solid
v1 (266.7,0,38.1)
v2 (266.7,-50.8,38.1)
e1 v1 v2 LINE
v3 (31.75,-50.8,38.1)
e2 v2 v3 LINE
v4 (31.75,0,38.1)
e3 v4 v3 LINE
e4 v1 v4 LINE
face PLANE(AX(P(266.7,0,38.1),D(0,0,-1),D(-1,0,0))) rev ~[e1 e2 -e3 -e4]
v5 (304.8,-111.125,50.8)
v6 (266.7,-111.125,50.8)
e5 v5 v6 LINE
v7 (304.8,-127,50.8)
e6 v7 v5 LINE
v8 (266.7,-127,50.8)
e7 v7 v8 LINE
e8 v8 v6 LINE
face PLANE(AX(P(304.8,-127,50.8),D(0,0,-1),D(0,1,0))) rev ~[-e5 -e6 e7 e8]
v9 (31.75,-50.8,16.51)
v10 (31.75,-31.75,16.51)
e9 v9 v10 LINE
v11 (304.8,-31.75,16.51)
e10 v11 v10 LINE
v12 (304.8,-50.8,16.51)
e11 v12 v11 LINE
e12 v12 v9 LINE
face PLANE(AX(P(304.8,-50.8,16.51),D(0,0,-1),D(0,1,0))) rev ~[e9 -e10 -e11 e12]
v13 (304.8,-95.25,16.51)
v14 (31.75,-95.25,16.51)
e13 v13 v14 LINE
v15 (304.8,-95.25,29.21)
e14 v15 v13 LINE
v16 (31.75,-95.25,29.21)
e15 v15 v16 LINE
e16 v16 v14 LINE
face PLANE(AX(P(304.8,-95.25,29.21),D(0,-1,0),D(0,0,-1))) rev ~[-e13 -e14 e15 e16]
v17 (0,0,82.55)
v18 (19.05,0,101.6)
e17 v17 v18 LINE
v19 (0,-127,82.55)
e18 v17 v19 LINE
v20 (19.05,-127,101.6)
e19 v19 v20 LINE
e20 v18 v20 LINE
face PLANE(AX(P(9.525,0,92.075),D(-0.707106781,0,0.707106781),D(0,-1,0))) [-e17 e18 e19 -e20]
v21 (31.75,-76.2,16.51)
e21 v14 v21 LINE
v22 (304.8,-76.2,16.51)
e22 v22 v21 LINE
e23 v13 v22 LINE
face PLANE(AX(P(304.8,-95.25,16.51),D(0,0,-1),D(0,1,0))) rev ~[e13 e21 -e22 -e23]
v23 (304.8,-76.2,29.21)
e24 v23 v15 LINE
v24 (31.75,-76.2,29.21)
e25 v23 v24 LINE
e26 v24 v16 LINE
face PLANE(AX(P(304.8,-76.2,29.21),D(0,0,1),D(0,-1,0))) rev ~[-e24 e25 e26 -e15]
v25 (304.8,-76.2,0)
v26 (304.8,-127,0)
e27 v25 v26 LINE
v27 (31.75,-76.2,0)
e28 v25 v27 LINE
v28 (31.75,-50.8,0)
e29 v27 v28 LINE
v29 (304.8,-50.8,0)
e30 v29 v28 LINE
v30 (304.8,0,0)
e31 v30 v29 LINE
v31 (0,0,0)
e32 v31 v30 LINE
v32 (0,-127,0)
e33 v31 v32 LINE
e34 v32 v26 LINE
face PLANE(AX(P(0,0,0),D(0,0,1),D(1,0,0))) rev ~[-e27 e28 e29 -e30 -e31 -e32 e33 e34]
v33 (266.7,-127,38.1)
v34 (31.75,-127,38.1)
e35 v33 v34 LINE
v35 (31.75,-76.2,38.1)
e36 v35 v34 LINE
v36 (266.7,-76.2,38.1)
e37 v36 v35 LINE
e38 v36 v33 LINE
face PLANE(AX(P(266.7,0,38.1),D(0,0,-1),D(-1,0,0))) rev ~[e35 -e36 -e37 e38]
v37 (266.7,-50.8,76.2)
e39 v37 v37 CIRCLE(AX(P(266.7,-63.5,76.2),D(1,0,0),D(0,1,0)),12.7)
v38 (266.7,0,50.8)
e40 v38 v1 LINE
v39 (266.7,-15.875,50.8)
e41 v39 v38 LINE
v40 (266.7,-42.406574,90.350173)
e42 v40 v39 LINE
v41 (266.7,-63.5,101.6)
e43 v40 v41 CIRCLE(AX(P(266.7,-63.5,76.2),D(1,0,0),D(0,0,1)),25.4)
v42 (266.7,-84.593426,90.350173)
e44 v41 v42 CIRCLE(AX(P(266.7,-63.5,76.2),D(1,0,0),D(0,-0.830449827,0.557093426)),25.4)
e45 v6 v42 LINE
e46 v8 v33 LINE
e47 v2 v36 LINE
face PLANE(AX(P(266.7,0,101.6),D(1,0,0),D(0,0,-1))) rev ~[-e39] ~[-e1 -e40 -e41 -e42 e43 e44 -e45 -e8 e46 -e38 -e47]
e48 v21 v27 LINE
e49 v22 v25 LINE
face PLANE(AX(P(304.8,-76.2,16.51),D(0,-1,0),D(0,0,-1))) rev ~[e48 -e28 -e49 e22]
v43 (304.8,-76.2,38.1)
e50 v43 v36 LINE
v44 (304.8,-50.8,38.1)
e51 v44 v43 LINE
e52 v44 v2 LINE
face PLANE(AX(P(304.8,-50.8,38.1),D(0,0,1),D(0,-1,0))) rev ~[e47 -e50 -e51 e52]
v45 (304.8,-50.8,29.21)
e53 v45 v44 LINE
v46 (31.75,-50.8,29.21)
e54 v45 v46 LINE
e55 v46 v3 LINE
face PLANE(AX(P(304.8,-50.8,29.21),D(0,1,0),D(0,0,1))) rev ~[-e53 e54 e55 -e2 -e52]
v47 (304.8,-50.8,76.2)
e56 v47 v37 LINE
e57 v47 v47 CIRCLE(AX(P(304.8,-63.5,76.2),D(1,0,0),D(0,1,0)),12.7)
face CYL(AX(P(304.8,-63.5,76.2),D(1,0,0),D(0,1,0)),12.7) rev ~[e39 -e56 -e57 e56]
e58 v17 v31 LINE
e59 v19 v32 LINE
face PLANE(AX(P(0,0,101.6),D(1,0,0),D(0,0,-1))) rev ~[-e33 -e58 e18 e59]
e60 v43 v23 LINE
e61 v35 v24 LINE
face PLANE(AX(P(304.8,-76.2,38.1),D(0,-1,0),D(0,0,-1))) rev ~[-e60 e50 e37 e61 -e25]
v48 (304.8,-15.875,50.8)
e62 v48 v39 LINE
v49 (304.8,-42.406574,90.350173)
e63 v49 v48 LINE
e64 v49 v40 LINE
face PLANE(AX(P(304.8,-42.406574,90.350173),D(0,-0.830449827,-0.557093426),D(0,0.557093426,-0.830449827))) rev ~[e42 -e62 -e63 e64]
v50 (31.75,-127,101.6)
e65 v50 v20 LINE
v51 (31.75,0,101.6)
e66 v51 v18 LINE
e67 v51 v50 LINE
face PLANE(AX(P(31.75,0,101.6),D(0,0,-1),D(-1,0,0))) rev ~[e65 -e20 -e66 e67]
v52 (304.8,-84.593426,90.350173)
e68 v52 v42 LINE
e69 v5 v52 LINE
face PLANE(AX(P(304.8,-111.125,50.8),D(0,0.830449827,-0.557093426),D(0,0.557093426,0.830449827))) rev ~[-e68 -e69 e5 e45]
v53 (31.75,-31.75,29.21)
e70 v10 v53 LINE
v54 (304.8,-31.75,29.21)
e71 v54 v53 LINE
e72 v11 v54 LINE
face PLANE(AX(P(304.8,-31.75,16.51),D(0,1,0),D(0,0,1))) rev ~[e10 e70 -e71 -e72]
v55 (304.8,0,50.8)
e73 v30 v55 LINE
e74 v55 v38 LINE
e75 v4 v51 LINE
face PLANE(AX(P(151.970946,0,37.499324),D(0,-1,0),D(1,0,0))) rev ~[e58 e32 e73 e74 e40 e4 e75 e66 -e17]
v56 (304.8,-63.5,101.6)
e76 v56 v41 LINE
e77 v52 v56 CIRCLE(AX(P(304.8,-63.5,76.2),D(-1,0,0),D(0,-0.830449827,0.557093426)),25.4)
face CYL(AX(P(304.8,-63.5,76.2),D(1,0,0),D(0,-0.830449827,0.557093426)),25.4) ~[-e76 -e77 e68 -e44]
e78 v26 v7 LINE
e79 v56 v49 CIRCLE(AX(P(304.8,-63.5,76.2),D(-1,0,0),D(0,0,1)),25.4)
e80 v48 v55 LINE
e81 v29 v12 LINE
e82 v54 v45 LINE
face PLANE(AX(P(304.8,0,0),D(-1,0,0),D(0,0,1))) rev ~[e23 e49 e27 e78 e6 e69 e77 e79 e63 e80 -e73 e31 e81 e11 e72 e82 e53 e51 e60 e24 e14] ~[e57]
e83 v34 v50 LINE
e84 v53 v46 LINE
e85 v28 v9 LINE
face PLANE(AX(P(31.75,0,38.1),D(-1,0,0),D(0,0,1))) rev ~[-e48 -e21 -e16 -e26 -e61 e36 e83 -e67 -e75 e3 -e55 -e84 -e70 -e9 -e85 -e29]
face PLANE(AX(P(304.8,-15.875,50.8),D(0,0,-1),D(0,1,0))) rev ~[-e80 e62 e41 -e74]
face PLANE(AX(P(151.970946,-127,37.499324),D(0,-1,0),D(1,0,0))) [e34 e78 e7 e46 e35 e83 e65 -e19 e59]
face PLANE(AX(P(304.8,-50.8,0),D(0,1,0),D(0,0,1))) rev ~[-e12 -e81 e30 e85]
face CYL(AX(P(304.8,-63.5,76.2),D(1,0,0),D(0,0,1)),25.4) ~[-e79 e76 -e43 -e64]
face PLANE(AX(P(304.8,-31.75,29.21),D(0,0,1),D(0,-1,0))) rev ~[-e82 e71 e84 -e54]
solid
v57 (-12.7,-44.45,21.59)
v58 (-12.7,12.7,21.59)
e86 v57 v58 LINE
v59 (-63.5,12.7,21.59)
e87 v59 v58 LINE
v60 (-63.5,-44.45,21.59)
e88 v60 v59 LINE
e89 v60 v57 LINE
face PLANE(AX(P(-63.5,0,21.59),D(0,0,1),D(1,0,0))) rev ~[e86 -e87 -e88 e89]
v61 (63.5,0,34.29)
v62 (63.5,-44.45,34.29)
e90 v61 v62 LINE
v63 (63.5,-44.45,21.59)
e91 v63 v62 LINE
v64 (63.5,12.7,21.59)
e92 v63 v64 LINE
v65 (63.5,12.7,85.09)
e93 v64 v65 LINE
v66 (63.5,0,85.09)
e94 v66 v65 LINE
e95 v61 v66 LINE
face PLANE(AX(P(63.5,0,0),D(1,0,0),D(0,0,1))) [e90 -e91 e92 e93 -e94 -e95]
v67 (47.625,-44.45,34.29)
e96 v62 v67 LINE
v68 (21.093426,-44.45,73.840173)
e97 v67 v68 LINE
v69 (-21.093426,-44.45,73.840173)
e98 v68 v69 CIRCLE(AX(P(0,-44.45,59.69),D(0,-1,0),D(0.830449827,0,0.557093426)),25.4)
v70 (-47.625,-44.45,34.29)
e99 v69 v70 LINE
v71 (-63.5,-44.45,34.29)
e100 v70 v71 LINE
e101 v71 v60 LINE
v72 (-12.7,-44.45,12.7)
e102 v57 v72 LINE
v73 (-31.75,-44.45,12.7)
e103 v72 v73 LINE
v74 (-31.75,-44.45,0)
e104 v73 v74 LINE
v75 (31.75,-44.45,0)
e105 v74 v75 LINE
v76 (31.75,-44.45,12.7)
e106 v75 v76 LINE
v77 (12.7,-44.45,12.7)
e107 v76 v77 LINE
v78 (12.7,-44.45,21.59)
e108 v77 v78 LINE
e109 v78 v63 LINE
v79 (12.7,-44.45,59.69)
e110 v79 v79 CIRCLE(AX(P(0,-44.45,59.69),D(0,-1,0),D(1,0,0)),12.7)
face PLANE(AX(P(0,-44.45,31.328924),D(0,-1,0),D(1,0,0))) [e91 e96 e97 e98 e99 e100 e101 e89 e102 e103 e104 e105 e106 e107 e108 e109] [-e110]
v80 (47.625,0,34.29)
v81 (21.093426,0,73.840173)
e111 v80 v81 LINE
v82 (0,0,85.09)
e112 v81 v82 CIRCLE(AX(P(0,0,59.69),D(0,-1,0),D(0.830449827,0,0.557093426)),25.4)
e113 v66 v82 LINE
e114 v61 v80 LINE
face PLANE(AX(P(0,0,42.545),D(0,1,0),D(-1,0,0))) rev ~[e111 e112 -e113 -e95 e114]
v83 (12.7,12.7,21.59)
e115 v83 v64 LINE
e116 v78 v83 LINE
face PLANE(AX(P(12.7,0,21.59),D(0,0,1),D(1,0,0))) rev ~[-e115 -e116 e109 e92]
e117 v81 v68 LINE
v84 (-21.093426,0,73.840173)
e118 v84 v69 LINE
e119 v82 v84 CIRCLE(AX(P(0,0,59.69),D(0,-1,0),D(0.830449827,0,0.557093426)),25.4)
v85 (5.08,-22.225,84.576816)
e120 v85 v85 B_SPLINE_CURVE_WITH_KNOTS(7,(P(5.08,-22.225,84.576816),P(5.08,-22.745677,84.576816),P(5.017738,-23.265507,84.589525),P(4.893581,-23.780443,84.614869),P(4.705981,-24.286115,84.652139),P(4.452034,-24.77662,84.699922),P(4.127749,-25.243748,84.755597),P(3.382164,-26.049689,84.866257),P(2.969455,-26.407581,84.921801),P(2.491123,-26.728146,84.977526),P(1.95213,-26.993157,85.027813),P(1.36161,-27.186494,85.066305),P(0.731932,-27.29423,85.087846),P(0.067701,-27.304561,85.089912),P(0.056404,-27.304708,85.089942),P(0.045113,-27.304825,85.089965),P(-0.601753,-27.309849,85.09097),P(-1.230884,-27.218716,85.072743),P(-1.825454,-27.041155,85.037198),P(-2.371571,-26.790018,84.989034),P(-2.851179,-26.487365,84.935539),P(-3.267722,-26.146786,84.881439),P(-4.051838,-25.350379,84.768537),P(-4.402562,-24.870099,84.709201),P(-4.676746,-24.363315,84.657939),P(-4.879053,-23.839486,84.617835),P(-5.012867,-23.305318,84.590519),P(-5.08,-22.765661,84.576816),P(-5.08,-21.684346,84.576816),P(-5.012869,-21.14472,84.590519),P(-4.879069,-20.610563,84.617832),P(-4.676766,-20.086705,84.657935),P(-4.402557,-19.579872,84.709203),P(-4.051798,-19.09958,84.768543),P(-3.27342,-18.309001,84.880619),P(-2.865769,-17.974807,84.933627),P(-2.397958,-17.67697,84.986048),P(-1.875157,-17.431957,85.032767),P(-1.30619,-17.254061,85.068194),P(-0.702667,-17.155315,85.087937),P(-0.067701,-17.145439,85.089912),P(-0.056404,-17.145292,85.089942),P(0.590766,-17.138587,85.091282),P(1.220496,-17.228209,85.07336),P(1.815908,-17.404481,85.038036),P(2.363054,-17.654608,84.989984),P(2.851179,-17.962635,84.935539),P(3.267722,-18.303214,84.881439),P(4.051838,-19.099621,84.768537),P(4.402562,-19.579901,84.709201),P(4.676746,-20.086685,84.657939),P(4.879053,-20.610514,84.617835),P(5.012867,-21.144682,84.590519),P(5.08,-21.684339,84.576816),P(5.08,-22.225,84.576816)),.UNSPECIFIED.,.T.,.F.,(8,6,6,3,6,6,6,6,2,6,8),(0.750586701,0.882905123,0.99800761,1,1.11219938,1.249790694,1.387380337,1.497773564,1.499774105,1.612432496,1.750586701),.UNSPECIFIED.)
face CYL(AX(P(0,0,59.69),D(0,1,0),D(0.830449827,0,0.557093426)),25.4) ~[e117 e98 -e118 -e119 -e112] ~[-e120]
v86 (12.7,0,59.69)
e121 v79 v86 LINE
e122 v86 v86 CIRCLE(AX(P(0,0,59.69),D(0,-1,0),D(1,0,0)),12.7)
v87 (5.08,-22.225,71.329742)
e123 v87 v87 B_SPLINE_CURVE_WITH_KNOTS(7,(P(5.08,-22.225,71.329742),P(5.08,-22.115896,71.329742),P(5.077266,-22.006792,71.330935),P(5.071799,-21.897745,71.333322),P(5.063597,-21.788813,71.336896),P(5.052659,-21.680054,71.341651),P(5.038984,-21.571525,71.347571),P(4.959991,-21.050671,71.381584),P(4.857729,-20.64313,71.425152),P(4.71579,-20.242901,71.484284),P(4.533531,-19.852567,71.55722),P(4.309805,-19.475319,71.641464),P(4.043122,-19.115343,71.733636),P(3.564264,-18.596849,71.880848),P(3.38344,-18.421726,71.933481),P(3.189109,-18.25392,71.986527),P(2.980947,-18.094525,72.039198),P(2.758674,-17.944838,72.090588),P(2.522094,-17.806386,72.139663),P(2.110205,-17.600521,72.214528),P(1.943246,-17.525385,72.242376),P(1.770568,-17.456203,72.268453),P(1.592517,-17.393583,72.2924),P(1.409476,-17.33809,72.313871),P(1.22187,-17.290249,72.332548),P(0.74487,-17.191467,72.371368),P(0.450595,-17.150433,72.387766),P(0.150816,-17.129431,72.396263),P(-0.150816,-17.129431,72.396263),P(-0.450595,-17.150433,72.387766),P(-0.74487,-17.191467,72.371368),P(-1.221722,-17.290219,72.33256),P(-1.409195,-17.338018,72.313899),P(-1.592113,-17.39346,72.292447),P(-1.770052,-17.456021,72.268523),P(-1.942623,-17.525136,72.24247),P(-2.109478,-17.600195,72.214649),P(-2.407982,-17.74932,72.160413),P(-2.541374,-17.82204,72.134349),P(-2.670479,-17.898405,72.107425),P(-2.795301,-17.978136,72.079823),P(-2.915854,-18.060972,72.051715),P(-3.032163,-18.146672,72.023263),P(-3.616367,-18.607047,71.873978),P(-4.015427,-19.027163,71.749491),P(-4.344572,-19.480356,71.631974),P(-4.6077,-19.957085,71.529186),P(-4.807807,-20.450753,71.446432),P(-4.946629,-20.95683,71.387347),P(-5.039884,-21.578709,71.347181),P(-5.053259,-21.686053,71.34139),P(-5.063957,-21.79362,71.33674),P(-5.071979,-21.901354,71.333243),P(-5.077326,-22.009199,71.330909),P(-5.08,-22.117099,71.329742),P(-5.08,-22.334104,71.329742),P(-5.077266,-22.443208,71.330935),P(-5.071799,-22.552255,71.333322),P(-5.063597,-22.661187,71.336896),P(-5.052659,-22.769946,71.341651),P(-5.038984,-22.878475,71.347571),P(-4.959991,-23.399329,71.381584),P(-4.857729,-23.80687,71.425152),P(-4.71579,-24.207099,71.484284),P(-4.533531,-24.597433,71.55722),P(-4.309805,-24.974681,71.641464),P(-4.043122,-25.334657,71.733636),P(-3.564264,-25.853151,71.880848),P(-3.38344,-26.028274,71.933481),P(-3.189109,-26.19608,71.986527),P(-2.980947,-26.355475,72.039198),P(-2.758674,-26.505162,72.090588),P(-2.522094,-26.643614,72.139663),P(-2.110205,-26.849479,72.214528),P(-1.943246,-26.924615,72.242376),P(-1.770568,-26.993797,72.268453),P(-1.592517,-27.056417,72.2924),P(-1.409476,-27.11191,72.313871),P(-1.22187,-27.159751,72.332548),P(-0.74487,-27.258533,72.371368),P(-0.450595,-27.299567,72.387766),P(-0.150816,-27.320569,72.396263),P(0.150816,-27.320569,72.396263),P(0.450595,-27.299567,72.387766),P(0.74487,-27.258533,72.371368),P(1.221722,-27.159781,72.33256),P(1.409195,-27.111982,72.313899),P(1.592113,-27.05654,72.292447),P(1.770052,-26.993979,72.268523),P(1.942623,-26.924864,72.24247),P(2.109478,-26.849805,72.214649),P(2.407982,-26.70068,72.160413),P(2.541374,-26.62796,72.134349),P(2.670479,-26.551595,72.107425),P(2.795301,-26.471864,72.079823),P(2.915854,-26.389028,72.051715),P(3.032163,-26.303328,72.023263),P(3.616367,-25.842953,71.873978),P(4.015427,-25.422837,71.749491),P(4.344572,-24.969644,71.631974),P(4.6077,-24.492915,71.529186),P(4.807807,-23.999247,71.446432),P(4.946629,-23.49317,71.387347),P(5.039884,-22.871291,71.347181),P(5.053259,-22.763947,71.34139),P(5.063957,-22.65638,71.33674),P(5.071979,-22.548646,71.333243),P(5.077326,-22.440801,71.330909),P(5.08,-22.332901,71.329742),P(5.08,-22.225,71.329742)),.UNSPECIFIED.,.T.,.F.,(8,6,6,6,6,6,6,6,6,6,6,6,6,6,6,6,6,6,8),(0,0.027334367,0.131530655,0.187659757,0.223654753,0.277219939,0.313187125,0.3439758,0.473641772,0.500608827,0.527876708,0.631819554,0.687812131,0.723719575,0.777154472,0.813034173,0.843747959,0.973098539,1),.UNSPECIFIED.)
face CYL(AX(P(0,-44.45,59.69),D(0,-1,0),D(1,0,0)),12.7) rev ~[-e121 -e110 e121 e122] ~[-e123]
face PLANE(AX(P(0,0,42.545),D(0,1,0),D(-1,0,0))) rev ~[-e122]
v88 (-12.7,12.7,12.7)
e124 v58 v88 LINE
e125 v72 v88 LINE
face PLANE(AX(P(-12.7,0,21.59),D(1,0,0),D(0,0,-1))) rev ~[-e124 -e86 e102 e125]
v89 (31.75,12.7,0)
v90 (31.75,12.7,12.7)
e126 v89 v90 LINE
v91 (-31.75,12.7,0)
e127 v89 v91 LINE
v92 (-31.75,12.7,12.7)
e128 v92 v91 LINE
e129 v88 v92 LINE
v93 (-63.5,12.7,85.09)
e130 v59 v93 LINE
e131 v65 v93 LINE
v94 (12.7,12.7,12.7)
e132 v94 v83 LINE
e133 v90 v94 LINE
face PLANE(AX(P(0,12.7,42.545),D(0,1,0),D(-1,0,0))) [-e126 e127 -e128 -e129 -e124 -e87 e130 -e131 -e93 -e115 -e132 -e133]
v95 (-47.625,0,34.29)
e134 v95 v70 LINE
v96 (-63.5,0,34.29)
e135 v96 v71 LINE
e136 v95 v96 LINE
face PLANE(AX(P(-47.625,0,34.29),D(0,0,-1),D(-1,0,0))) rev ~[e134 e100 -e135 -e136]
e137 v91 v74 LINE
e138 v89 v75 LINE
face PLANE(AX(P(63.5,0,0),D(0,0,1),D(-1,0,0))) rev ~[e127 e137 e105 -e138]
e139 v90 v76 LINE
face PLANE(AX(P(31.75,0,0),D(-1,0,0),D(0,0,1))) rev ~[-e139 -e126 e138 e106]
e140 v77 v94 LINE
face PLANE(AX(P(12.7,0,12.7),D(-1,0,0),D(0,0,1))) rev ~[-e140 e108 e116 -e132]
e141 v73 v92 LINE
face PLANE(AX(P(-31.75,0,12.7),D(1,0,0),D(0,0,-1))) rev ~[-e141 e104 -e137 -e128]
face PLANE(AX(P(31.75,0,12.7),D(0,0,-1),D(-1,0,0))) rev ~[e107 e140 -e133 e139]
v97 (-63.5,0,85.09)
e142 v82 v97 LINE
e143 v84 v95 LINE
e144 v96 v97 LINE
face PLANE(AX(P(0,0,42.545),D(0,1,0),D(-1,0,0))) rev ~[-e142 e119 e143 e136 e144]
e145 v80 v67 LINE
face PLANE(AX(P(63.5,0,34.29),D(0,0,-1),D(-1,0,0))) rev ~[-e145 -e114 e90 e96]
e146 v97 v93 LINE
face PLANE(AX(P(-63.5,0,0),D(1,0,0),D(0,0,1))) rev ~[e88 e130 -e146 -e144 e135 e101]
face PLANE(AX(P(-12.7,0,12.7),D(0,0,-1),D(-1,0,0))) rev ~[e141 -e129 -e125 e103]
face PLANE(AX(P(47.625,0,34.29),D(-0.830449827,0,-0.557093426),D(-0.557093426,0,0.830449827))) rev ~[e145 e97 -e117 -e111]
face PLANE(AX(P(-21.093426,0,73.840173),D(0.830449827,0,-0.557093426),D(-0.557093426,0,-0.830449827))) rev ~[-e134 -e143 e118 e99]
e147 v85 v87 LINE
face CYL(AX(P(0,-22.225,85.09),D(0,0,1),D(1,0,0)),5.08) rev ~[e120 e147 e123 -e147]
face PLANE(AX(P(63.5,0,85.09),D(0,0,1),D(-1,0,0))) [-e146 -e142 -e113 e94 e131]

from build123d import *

# Parameters (mm, degrees)
F1_DEPTH  = 127
F2_SIZE2  = 19.05
F2_SIZE   = 19.05
F4_DEPTH  = 50.8
F5_R      = 12.7
F6_DEPTH  = 50.8
F8_DEPTH  = 273.05
F10_DEPTH = 44.45
F11_R     = 12.7
F12_DEPTH = 44.45
F13_W     = 127
F13_H     = 85.09
F14_DEPTH = 12.7
F16_DEPTH = 12.7
F18_R     = 5.08
F19_DEPTH = 25.4


with BuildPart() as f1:
    # F0 (on Front) → F1 (new body)
    with BuildSketch(Plane.XZ):
        Polygon((0, 101.6), (0, 0), (304.8, 0), (304.8, 101.6), (266.7, 101.6), (266.7, 38.1), (31.75, 38.1), (31.75, 101.6), align=None)
    extrude(amount=F1_DEPTH)

    # F2
    f2_edges = [f1.edges().sort_by_distance(p)[0] for p in [
        (0, -63.5, 101.6),
    ]]
    chamfer(f2_edges, length=F2_SIZE, length2=F2_SIZE2)

    # F3 (on face) → F4 (cut)
    with BuildSketch(Plane.YZ.offset(304.8)):
        with BuildLine():
            Line((-127, 101.6), (-127, 50.8))
            Line((-127, 50.8), (-111.125, 50.8))
            Line((-111.125, 50.8), (-84.5934256055, 90.3501730104))
            ThreePointArc((-84.5934256055, 90.3501730104), (-75.4529411765, 98.6117647059), (-63.5, 101.6))
            Line((-63.5, 101.6), (-127, 101.6))
        make_face()
        with BuildLine():
            Line((0, 101.6), (-63.5, 101.6))
            ThreePointArc((-63.5, 101.6), (-51.5470588235, 98.6117647059), (-42.4065743945, 90.3501730104))
            Line((-42.4065743945, 90.3501730104), (-15.875, 50.8))
            Line((-15.875, 50.8), (0, 50.8))
            Line((0, 50.8), (0, 101.6))
        make_face()
    extrude(amount=-F4_DEPTH, mode=Mode.SUBTRACT)

    # F5 (on face) → F6 (cut)
    with BuildSketch(Plane.YZ.offset(304.8)):
        with Locations((-63.5, 76.2)):
            Circle(F5_R)
    extrude(amount=-F6_DEPTH, mode=Mode.SUBTRACT)

    # F7 (on face) → F8 (cut, through all)
    with BuildSketch(Plane.YZ.offset(304.8)):
        Polygon((-76.2, 16.51), (-76.2, 0), (-50.8, 0), (-50.8, 16.51), (-31.75, 16.51), (-31.75, 29.21), (-50.8, 29.21), (-50.8, 38.1), (-76.2, 38.1), (-76.2, 29.21), (-95.25, 29.21), (-95.25, 16.51), align=None)
    extrude(amount=-F8_DEPTH, mode=Mode.SUBTRACT)


with BuildPart() as f10:
    # F9 (on Front) → F10 (new body)
    with BuildSketch(Plane.XZ):
        with BuildLine():
            Line((-31.75, 12.7), (-31.75, 0))
            Line((-31.75, 0), (31.75, 0))
            Line((31.75, 0), (31.75, 12.7))
            Line((31.75, 12.7), (12.7, 12.7))
            Line((12.7, 12.7), (12.7, 21.59))
            Line((12.7, 21.59), (63.5, 21.59))
            Line((63.5, 21.59), (63.5, 34.29))
            Line((63.5, 34.29), (47.625, 34.29))
            Line((47.625, 34.29), (21.0934256055, 73.8401730104))
            ThreePointArc((21.0934256055, 73.8401730104), (0, 85.09), (-21.0934256055, 73.8401730104))
            Line((-21.0934256055, 73.8401730104), (-47.625, 34.29))
            Line((-47.625, 34.29), (-63.5, 34.29))
            Line((-63.5, 34.29), (-63.5, 21.59))
            Line((-63.5, 21.59), (-12.7, 21.59))
            Line((-12.7, 21.59), (-12.7, 12.7))
            Line((-12.7, 12.7), (-31.75, 12.7))
        make_face()
    extrude(amount=F10_DEPTH)

    # F11 (on face) → F12 (cut)
    with BuildSketch(Plane.XZ.offset(44.45)):
        with Locations((0, 59.69)):
            Circle(F11_R)
    extrude(amount=-F12_DEPTH, mode=Mode.SUBTRACT)

    # F13 (on face) → F14 (join)
    with BuildSketch(Plane(origin=(0, 0, 0), x_dir=(-1, 0, 0), z_dir=(0, 1, 0))):
        with Locations((0, 42.545)):
            Rectangle(F13_W, F13_H)
    extrude(amount=F14_DEPTH)

    # F15 (on face) → F16 (cut)
    with BuildSketch(Plane(origin=(0, 12.7, 0), x_dir=(-1, 0, 0), z_dir=(0, 1, 0))):
        Polygon((-63.5, 21.59), (-63.5, 0), (-31.75, 0), (-31.75, 12.7), (-12.7, 12.7), (-12.7, 21.59), align=None)
        Polygon((63.5, 21.59), (12.7, 21.59), (12.7, 12.7), (31.75, 12.7), (31.75, 0), (63.5, 0), align=None)
    extrude(amount=-F16_DEPTH, mode=Mode.SUBTRACT)

    # F18 (on offset) → F19 (cut)
    with BuildSketch(Plane.XY.offset(85.09)):
        with Locations((0, -22.225)):
            Circle(F18_R)
    extrude(amount=-F19_DEPTH, mode=Mode.SUBTRACT)


solid = Compound([f1.part, f10.part])
